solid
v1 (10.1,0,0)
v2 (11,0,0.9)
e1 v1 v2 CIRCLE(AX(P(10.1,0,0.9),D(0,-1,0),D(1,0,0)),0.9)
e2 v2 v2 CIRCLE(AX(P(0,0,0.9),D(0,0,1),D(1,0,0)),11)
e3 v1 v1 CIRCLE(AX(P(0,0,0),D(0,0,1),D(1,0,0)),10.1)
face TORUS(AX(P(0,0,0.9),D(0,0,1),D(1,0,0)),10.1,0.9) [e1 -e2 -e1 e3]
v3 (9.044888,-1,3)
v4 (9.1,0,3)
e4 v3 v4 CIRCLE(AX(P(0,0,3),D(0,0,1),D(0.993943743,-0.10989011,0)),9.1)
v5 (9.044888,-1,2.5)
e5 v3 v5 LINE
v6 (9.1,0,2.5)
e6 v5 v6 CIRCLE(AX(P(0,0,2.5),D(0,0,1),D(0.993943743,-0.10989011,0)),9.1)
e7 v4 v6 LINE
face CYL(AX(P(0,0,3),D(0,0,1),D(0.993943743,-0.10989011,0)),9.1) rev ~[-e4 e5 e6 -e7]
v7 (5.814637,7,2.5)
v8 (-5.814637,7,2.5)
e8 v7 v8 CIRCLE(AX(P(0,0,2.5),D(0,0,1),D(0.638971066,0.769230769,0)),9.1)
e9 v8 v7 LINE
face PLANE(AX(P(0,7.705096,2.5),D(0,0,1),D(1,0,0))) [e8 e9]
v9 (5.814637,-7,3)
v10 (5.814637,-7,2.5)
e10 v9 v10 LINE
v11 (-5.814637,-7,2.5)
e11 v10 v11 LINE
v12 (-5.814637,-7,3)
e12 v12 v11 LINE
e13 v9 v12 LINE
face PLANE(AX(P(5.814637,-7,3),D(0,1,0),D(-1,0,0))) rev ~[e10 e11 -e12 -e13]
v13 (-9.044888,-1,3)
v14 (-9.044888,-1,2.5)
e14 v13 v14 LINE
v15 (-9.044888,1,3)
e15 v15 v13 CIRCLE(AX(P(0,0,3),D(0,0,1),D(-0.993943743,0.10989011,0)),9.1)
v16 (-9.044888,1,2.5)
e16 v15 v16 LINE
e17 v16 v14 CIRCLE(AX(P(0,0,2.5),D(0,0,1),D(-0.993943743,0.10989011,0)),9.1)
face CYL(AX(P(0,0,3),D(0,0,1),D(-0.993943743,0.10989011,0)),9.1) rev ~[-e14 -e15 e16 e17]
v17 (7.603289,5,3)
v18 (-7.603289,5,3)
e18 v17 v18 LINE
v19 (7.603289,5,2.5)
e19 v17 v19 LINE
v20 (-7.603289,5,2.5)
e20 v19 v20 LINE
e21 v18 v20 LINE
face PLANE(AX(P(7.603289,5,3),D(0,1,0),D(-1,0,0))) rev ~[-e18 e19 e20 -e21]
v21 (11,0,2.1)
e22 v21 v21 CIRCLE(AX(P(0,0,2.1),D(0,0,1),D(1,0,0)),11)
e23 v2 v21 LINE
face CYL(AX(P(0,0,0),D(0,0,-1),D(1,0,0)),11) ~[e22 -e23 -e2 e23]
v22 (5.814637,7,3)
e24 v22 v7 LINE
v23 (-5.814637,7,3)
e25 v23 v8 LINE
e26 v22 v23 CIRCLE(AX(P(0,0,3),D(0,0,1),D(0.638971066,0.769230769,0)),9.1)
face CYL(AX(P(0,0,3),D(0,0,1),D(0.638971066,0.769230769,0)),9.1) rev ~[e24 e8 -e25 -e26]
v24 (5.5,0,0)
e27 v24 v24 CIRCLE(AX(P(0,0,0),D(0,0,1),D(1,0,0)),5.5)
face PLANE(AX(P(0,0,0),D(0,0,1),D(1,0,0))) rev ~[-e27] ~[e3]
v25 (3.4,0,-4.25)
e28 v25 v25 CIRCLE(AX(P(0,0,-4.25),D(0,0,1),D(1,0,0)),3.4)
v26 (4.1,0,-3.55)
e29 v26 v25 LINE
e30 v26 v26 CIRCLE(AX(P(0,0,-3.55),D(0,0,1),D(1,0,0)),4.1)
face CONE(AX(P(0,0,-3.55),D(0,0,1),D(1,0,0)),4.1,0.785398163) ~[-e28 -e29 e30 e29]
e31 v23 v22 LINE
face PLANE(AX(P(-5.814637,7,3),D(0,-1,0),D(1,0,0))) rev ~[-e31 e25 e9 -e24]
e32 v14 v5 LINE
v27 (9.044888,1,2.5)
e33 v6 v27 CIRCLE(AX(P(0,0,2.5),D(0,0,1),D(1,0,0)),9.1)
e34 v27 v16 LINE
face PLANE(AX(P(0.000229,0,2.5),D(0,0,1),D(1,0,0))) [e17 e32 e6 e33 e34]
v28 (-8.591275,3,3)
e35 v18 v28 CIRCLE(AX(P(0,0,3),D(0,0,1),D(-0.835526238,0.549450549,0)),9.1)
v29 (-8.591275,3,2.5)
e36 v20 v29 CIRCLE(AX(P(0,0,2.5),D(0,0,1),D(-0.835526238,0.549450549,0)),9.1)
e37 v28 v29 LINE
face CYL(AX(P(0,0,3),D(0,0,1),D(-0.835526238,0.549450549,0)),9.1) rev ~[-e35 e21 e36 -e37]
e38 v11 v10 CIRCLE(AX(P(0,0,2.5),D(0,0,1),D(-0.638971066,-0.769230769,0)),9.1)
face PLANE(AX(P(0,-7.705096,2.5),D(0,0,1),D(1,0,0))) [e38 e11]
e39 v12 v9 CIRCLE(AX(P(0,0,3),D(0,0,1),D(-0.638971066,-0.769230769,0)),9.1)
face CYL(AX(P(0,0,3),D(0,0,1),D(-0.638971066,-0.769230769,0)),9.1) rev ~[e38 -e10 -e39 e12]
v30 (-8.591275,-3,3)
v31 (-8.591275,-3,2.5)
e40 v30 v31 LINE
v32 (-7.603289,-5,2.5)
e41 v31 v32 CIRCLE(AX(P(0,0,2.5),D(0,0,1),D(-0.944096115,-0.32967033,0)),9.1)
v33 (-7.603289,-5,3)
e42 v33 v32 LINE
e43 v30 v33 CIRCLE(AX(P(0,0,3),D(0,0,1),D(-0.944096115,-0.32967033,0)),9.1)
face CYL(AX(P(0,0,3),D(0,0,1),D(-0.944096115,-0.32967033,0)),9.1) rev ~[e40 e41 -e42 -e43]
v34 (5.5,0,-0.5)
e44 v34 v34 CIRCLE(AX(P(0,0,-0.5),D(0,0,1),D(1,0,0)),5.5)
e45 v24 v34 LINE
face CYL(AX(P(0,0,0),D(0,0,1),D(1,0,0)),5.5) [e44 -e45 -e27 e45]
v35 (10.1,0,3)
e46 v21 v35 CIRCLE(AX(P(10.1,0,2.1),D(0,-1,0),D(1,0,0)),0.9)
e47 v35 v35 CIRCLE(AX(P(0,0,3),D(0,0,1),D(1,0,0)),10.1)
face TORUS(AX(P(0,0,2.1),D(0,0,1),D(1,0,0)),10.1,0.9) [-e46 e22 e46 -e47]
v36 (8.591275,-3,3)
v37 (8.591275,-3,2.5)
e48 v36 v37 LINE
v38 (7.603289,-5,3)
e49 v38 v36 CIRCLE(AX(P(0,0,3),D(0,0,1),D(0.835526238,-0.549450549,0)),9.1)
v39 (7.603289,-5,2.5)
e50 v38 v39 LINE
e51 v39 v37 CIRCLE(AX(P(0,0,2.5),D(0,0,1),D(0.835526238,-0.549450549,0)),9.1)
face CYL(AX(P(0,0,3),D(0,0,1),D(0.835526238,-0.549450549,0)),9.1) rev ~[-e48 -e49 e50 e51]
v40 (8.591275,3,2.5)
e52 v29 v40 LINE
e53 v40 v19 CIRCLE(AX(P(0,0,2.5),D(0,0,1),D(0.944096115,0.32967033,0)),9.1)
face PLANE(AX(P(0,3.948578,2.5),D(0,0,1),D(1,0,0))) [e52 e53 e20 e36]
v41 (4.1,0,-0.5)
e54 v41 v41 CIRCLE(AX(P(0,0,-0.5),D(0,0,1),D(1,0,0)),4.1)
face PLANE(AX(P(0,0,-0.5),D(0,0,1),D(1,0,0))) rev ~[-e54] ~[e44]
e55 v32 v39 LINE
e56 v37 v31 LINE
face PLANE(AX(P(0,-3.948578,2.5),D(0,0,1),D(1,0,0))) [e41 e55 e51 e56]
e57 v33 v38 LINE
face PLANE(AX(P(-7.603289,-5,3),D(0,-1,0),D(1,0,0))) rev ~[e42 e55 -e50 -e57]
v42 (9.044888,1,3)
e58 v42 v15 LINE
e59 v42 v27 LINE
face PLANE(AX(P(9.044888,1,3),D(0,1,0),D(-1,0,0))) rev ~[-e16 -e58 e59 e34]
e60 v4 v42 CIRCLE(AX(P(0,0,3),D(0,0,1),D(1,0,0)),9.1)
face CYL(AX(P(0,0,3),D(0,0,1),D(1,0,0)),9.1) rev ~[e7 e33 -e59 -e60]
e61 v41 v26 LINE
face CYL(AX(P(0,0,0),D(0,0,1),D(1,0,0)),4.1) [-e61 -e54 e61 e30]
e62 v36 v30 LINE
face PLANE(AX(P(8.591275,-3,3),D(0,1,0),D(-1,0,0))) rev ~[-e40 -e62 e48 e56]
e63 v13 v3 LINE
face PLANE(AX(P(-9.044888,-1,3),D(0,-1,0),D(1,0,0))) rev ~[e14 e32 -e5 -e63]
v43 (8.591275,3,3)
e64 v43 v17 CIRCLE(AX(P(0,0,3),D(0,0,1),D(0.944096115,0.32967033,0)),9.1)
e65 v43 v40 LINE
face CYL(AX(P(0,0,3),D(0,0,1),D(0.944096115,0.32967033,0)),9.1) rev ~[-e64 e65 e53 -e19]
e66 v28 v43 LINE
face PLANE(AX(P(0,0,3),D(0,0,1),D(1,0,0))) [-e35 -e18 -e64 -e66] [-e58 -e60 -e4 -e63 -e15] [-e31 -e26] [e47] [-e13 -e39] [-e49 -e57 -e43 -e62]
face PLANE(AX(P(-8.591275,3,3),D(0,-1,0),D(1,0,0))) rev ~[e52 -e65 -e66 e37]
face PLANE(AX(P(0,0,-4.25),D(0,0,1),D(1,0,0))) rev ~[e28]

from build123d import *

# Parameters (mm, degrees)
F0_R     = 11
F0_R_2   = 5.5
F0_R_3   = 4.1
F1_DEPTH = 3
F2_DEPTH = 4.25
F3_SIZE  = 0.7
F4_R     = 0.9
F5_DEPTH = 0.5
F7_DEPTH = 0.5


with BuildPart() as f1:
    # F0 (on Top) → F1 (new body)
    with BuildSketch(Plane.XY):
        Circle(F0_R)
        Circle(F0_R_2, mode=Mode.SUBTRACT)
        Circle(F0_R_2)
        Circle(F0_R_3, mode=Mode.SUBTRACT)
        Circle(F0_R_3)
    extrude(amount=F1_DEPTH)

    # F0 (on Top) → F2 (join)
    with BuildSketch(Plane.XY):
        Circle(F0_R_3)
    extrude(amount=-F2_DEPTH)

    # F3
    f3_edges = [f1.edges().sort_by_distance(p)[0] for p in [
        (-4.1, 0, -4.25),
    ]]
    chamfer(f3_edges, length=F3_SIZE)

    # F4
    f4_edges = [f1.edges().sort_by_distance(p)[0] for p in [
        (11, 0, 1.5),
        (-11, 0, 0),
        (-11, 0, 3),
    ]]
    fillet(f4_edges, radius=F4_R)

    # F0 (on Top) → F5 (join)
    with BuildSketch(Plane.XY):
        Circle(F0_R_2)
        Circle(F0_R_3, mode=Mode.SUBTRACT)
    extrude(amount=-F5_DEPTH)

    # F6 (on face) → F7 (cut)
    with BuildSketch(Plane.XY.offset(3)):
        with BuildLine():
            ThreePointArc((1.3453624047, -9), (3.7170414054, -8.3062388113), (5.814636704, -7))
            Line((5.814636704, -7), (-5.814636704, -7))
            ThreePointArc((-5.814636704, -7), (-3.7170414054, -8.3062388113), (-1.3453624047, -9))
            Line((-1.3453624047, -9), (1.3453624047, -9))
        make_face()
        with BuildLine():
            ThreePointArc((7.6032887621, -5), (8.1587971524, -4.0303881979), (8.5912746435, -3))
            Line((8.5912746435, -3), (-8.5912746435, -3))
            ThreePointArc((-8.5912746435, -3), (-8.1587971524, -4.0303881979), (-7.6032887621, -5))
            Line((-7.6032887621, -5), (7.6032887621, -5))
        make_face()
        with BuildLine():
            ThreePointArc((9.044888059, -1), (9.0862115686, -0.5007587558), (9.1, 0))
            ThreePointArc((9.1, 0), (9.0862115686, 0.5007587558), (9.044888059, 1))
            Line((9.044888059, 1), (-9.044888059, 1))
            ThreePointArc((-9.044888059, 1), (-9.1, 0), (-9.044888059, -1))
            Line((-9.044888059, -1), (9.044888059, -1))
        make_face()
        with BuildLine():
            Line((-8.5912746435, 3), (8.5912746435, 3))
            ThreePointArc((8.5912746435, 3), (8.1587971524, 4.0303881979), (7.6032887621, 5))
            Line((7.6032887621, 5), (-7.6032887621, 5))
            ThreePointArc((-7.6032887621, 5), (-8.1587971524, 4.0303881979), (-8.5912746435, 3))
        make_face()
        with BuildLine():
            Line((-5.814636704, 7), (5.814636704, 7))
            ThreePointArc((5.814636704, 7), (3.7170414054, 8.3062388113), (1.3453624047, 9))
            Line((1.3453624047, 9), (-1.3453624047, 9))
            ThreePointArc((-1.3453624047, 9), (-3.7170414054, 8.3062388113), (-5.814636704, 7))
        make_face()
        with BuildLine():
            ThreePointArc((-1.3453624047, -9), (0, -9.1), (1.3453624047, -9))
            Line((1.3453624047, -9), (-1.3453624047, -9))
        make_face()
        with BuildLine():
            Line((-1.3453624047, 9), (1.3453624047, 9))
            ThreePointArc((1.3453624047, 9), (0, 9.1), (-1.3453624047, 9))
        make_face()
    extrude(amount=-F7_DEPTH, mode=Mode.SUBTRACT)


solid = f1.part
